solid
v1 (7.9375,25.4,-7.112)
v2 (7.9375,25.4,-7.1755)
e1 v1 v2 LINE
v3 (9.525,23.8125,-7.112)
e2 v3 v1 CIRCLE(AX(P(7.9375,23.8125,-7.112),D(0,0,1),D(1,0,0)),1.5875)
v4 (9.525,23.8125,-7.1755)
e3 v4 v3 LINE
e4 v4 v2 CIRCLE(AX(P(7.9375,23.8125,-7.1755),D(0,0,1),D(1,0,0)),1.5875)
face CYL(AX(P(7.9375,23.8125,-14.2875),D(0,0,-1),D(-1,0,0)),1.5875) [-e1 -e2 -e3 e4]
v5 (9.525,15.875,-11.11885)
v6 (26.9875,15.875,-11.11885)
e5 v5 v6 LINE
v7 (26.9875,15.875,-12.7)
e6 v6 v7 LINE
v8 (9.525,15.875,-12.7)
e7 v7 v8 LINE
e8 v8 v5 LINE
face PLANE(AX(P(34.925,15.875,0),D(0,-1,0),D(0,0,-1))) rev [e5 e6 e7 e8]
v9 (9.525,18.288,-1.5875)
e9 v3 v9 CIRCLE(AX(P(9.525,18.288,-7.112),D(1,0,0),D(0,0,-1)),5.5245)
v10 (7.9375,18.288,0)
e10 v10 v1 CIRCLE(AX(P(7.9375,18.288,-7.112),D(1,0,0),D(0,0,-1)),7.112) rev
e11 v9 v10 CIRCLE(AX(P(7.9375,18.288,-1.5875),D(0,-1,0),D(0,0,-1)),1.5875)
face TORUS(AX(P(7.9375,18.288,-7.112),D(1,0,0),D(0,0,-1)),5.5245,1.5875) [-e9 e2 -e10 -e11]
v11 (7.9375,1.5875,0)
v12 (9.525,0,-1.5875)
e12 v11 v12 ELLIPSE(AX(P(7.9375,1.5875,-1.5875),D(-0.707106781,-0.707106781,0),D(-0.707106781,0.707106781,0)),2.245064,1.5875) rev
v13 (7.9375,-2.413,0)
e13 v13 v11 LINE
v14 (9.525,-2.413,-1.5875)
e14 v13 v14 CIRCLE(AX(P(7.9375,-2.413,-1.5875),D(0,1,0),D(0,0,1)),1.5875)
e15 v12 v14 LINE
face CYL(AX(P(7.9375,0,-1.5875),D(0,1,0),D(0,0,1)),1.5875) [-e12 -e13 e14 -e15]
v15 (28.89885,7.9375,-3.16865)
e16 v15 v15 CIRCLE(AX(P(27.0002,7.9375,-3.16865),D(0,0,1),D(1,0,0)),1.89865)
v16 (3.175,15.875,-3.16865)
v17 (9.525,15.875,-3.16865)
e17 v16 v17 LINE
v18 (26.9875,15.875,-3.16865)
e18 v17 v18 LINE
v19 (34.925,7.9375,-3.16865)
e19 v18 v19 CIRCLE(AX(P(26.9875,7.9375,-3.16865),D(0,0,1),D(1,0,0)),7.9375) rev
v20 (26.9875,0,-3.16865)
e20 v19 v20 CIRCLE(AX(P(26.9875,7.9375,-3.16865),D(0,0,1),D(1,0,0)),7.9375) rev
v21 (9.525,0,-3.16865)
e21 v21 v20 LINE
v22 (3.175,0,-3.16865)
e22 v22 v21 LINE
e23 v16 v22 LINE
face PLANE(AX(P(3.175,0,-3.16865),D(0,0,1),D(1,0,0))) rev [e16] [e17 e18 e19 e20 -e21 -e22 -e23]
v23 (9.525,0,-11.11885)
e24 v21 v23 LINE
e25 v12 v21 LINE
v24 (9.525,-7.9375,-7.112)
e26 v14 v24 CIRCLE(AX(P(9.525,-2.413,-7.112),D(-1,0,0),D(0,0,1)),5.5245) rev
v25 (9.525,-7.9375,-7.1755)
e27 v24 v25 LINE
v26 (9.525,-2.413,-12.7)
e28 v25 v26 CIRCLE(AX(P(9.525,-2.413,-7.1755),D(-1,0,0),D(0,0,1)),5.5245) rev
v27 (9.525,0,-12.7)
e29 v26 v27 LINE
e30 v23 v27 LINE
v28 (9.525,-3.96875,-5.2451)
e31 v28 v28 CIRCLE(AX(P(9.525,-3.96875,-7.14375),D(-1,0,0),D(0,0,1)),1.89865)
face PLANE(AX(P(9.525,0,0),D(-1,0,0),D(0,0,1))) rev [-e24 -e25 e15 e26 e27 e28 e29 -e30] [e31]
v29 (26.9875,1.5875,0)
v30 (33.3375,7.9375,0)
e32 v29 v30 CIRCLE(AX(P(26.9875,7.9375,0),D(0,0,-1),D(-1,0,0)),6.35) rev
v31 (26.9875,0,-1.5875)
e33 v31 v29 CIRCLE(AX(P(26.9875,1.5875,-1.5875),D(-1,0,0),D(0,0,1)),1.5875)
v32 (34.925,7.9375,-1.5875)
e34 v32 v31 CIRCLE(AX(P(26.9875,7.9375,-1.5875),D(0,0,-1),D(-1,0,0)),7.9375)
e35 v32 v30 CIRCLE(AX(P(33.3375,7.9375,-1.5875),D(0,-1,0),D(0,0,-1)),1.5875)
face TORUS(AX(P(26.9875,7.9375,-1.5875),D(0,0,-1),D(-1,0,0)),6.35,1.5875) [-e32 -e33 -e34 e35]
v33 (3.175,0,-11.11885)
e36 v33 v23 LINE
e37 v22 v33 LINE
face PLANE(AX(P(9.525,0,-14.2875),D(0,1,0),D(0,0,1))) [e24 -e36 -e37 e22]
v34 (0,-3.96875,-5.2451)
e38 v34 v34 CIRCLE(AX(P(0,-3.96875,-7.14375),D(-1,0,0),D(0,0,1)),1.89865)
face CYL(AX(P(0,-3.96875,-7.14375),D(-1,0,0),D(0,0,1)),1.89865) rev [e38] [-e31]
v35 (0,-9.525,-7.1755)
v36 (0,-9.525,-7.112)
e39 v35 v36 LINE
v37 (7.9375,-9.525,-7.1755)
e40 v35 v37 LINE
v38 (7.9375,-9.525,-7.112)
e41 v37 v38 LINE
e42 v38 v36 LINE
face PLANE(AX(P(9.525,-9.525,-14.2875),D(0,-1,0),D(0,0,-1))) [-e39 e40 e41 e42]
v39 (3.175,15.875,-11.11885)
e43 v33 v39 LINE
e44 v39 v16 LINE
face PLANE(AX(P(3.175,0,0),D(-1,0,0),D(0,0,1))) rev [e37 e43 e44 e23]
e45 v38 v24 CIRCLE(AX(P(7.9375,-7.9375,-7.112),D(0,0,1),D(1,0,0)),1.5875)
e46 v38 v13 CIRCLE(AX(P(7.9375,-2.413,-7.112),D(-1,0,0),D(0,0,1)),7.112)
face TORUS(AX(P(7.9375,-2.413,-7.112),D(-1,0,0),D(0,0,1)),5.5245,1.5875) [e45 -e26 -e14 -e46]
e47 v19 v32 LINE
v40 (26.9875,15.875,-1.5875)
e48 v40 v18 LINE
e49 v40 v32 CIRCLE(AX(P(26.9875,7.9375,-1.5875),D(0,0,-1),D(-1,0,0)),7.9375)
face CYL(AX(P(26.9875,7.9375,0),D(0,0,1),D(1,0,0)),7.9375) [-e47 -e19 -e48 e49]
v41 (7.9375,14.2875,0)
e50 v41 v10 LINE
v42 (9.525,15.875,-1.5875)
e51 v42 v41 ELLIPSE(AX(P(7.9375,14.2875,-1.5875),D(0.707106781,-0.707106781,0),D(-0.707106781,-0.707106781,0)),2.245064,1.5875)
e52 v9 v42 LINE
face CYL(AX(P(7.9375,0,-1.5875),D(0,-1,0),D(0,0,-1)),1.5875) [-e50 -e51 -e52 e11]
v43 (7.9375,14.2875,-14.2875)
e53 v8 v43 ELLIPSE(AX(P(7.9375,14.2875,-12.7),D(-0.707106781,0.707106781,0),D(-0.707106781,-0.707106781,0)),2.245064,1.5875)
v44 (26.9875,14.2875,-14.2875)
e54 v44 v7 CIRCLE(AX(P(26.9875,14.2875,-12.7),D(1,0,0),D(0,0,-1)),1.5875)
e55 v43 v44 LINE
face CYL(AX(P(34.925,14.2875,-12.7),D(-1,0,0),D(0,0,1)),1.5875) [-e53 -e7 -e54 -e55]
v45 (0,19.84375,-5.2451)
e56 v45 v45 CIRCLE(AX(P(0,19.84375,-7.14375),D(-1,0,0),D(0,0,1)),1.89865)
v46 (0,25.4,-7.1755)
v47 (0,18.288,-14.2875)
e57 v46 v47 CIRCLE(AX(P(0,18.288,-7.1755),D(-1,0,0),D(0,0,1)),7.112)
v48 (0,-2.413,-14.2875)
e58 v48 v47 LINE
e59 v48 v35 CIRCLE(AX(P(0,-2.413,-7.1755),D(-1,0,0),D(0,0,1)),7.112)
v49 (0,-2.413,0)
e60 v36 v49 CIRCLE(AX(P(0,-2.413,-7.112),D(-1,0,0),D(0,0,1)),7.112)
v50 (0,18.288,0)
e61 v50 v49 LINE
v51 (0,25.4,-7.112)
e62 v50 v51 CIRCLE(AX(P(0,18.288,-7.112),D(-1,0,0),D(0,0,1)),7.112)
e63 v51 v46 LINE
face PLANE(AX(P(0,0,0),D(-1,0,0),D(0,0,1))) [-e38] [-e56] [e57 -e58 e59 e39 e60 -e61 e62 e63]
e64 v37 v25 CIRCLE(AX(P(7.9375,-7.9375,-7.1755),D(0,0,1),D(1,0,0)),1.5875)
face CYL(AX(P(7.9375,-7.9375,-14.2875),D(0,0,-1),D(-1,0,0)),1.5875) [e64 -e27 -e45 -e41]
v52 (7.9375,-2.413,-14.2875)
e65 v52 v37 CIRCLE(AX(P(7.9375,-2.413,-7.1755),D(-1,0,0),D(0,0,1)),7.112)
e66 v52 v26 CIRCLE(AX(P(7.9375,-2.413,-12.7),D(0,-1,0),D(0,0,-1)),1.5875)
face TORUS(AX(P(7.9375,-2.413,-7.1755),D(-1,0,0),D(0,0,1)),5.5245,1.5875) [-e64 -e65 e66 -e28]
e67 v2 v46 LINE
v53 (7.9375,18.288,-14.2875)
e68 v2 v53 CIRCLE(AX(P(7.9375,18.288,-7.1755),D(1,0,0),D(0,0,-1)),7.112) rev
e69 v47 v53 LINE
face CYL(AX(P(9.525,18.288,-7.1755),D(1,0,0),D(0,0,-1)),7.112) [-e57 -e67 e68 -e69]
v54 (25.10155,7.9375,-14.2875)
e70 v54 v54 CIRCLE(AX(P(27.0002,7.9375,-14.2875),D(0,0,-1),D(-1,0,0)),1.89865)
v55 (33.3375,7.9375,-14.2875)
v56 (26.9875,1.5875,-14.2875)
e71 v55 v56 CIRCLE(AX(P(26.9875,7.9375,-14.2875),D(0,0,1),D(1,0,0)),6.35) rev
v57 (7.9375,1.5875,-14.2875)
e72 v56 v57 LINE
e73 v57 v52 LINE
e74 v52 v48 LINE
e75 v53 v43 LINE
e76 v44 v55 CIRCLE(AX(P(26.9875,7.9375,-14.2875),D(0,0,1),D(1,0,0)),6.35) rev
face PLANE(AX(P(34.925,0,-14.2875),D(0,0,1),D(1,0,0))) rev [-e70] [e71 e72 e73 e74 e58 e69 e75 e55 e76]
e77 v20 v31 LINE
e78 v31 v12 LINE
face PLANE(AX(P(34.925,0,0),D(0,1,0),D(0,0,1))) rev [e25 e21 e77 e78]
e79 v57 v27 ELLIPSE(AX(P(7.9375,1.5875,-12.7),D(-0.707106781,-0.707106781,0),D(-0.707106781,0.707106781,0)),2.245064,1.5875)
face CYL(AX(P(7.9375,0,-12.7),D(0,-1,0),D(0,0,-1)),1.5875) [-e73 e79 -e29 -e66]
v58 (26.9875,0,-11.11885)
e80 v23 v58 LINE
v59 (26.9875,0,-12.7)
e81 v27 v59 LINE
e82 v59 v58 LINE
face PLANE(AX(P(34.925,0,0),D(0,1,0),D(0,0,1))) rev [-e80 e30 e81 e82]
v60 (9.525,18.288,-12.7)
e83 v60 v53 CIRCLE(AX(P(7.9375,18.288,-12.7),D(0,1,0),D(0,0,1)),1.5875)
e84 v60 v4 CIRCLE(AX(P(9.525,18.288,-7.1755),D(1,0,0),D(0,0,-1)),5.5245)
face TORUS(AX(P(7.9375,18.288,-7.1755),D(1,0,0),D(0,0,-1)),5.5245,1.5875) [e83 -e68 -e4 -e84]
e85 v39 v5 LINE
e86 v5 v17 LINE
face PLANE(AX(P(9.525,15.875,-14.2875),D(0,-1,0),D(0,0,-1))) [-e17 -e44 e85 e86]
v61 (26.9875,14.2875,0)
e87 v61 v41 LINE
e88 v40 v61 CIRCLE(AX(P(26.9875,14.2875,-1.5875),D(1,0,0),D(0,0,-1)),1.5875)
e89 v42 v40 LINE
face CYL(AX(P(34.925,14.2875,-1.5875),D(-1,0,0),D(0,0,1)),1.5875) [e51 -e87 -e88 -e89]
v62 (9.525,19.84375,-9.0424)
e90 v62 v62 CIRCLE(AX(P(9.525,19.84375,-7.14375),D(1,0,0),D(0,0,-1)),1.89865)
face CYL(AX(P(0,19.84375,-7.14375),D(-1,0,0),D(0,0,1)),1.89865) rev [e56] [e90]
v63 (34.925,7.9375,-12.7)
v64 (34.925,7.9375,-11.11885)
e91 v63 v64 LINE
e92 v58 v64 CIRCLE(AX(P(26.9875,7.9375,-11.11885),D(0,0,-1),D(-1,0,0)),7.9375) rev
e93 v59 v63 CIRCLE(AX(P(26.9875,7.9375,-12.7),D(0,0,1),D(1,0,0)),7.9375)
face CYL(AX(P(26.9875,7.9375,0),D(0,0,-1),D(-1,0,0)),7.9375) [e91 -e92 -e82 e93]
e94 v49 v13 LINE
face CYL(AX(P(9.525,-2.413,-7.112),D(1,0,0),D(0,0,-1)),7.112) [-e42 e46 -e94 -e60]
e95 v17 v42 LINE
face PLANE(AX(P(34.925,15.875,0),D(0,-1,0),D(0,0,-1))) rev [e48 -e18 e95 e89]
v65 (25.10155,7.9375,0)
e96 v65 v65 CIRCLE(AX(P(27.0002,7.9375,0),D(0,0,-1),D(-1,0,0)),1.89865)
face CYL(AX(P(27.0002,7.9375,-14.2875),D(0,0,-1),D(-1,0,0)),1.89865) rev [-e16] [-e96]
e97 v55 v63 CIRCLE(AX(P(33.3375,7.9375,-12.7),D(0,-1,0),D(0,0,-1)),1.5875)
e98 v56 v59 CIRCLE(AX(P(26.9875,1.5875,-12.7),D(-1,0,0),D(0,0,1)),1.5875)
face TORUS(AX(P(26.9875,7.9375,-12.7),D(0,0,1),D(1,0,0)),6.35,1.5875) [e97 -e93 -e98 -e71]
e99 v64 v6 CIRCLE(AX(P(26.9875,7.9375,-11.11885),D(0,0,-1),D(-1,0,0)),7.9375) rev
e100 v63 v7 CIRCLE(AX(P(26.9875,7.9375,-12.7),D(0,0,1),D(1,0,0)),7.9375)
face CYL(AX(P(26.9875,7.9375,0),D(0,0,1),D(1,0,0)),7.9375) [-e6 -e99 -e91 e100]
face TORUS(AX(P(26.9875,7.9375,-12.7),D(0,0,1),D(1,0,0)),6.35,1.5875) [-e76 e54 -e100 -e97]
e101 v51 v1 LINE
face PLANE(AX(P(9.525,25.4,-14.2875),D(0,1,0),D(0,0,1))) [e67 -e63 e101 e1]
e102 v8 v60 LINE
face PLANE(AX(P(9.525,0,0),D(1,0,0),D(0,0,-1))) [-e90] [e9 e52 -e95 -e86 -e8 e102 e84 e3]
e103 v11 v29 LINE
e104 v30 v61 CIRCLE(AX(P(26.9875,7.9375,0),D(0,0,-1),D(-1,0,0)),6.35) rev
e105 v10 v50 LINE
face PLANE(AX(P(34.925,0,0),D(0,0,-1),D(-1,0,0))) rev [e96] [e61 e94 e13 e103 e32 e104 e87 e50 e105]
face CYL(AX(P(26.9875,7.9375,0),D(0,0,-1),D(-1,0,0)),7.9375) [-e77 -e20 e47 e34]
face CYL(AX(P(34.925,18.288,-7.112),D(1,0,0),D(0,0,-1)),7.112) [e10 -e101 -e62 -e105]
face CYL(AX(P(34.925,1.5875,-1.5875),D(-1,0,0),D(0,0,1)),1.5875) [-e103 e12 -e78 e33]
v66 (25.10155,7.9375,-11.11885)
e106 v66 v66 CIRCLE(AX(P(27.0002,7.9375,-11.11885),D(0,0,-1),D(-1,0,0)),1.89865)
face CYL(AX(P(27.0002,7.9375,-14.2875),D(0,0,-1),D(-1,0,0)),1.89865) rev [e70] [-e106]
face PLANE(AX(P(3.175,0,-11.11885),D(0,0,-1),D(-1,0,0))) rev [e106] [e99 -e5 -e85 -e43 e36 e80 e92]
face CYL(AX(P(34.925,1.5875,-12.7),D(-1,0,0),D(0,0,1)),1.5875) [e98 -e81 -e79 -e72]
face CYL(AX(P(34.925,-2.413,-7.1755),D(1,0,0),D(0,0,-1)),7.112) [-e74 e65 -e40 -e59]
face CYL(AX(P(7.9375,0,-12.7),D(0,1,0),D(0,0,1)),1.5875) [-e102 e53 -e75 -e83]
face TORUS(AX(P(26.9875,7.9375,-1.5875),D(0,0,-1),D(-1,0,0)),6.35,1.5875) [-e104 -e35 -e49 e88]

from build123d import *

# Parameters (mm, degrees)
SKETCH1_W             = 14.2875
SKETCH1_H             = 15.875
BOSS_EXTRUDE1_DEPTH   = 34.925
SKETCH2_W             = 7.9502
SKETCH2_H             = 15.875
CUT_EXTRUDE1_DEPTH    = 31.75
F_6_CLEARANCE_HOLE1_D = 3.7973
SKETCH5_W             = 14.2875
SKETCH5_H             = 9.525
BOSS_EXTRUDE2_DEPTH   = 9.525
F_6_CLEARANCE_HOLE2_D = 3.7973
FILLET1_R             = 7.112
FILLET3_R             = 7.9375
FILLET2_R             = 1.5875


with BuildPart() as part:
    # Sketch1 → Boss-Extrude1 (new body)
    with BuildSketch(Plane(origin=(0, 0, 0), x_dir=(0, 0, -1), z_dir=(1, 0, 0))):
        with Locations((7.14375, 7.9375)):
            Rectangle(SKETCH1_W, SKETCH1_H)
    extrude(amount=BOSS_EXTRUDE1_DEPTH)

    # Sketch2 → Cut-Extrude1 (cut)
    with BuildSketch(Plane(origin=(34.925, 0, 0), x_dir=(0, 0, -1), z_dir=(1, 0, 0))):
        with Locations((7.14375, 7.9375)):
            Rectangle(SKETCH2_W, SKETCH2_H)
    extrude(amount=-CUT_EXTRUDE1_DEPTH, mode=Mode.SUBTRACT)

    # #6 Clearance Hole1 (through all)
    with Locations(Plane(origin=(0, 0, -14.2875), x_dir=(-1, 0, 0), z_dir=(0, 0, -1))):
        with Locations((-27.0002, 7.9375)):
            Hole(F_6_CLEARANCE_HOLE1_D / 2)

    # Sketch5 → Boss-Extrude2 (add)
    with BuildSketch(Plane.ZY):
        with Locations((-7.14375, 20.6375)):
            Rectangle(SKETCH5_W, SKETCH5_H)
        with Locations((-7.14375, -4.7625)):
            Rectangle(SKETCH5_W, SKETCH5_H)
    extrude(amount=-BOSS_EXTRUDE2_DEPTH)

    # #6 Clearance Hole2 (through all)
    with Locations(Plane.ZY):
        with Locations((-7.14375, 19.84375), (-7.14375, -3.96875)):
            Hole(F_6_CLEARANCE_HOLE2_D / 2)

    # Fillet1
    fillet1_edges = [part.edges().sort_by_distance(p)[0] for p in [
        (4.7625, 25.4, -14.2875),
        (4.7625, 25.4, 0),
        (4.7625, -9.525, -14.2875),
        (4.7625, -9.525, 0),
    ]]
    fillet(fillet1_edges, radius=FILLET1_R)

    # Fillet3
    fillet3_edges = [part.edges().sort_by_distance(p)[0] for p in [
        (34.925, 0, -1.584325),
        (34.925, 0, -12.703175),
        (34.925, 15.875, -12.703175),
        (34.925, 15.875, -1.584325),
    ]]
    fillet(fillet3_edges, radius=FILLET3_R - 0.0001)  # a hair under: the kernel refuses the full size

    # Fillet2
    fillet2_edges = [part.edges().sort_by_distance(p)[0] for p in [
        (18.2563, 0, 0),
        (18.2563, 15.875, 0),
        (32.600189365, 13.550189365, 0),
        (32.600189365, 2.324810635, 0),
        (18.2563, 15.875, -14.2875),
        (18.2563, 0, -14.2875),
        (32.600189365, 13.550189365, -14.2875),
        (32.600189365, 2.324810635, -14.2875),
        (9.525, 17.0815, 0),
        (9.525, -1.2065, -14.2875),
        (9.525, 17.0815, -14.2875),
        (9.525, -9.525, -7.14375),
        (9.525, -1.2065, 0),
        (9.525, -7.441943428, -2.083056572),
        (9.525, -7.441943428, -12.204443428),
        (9.525, 25.4, -7.14375),
        (9.525, 23.316943428, -12.204443428),
        (9.525, 23.316943428, -2.083056572),
    ]]
    fillet(fillet2_edges, radius=FILLET2_R)


solid = part.part
